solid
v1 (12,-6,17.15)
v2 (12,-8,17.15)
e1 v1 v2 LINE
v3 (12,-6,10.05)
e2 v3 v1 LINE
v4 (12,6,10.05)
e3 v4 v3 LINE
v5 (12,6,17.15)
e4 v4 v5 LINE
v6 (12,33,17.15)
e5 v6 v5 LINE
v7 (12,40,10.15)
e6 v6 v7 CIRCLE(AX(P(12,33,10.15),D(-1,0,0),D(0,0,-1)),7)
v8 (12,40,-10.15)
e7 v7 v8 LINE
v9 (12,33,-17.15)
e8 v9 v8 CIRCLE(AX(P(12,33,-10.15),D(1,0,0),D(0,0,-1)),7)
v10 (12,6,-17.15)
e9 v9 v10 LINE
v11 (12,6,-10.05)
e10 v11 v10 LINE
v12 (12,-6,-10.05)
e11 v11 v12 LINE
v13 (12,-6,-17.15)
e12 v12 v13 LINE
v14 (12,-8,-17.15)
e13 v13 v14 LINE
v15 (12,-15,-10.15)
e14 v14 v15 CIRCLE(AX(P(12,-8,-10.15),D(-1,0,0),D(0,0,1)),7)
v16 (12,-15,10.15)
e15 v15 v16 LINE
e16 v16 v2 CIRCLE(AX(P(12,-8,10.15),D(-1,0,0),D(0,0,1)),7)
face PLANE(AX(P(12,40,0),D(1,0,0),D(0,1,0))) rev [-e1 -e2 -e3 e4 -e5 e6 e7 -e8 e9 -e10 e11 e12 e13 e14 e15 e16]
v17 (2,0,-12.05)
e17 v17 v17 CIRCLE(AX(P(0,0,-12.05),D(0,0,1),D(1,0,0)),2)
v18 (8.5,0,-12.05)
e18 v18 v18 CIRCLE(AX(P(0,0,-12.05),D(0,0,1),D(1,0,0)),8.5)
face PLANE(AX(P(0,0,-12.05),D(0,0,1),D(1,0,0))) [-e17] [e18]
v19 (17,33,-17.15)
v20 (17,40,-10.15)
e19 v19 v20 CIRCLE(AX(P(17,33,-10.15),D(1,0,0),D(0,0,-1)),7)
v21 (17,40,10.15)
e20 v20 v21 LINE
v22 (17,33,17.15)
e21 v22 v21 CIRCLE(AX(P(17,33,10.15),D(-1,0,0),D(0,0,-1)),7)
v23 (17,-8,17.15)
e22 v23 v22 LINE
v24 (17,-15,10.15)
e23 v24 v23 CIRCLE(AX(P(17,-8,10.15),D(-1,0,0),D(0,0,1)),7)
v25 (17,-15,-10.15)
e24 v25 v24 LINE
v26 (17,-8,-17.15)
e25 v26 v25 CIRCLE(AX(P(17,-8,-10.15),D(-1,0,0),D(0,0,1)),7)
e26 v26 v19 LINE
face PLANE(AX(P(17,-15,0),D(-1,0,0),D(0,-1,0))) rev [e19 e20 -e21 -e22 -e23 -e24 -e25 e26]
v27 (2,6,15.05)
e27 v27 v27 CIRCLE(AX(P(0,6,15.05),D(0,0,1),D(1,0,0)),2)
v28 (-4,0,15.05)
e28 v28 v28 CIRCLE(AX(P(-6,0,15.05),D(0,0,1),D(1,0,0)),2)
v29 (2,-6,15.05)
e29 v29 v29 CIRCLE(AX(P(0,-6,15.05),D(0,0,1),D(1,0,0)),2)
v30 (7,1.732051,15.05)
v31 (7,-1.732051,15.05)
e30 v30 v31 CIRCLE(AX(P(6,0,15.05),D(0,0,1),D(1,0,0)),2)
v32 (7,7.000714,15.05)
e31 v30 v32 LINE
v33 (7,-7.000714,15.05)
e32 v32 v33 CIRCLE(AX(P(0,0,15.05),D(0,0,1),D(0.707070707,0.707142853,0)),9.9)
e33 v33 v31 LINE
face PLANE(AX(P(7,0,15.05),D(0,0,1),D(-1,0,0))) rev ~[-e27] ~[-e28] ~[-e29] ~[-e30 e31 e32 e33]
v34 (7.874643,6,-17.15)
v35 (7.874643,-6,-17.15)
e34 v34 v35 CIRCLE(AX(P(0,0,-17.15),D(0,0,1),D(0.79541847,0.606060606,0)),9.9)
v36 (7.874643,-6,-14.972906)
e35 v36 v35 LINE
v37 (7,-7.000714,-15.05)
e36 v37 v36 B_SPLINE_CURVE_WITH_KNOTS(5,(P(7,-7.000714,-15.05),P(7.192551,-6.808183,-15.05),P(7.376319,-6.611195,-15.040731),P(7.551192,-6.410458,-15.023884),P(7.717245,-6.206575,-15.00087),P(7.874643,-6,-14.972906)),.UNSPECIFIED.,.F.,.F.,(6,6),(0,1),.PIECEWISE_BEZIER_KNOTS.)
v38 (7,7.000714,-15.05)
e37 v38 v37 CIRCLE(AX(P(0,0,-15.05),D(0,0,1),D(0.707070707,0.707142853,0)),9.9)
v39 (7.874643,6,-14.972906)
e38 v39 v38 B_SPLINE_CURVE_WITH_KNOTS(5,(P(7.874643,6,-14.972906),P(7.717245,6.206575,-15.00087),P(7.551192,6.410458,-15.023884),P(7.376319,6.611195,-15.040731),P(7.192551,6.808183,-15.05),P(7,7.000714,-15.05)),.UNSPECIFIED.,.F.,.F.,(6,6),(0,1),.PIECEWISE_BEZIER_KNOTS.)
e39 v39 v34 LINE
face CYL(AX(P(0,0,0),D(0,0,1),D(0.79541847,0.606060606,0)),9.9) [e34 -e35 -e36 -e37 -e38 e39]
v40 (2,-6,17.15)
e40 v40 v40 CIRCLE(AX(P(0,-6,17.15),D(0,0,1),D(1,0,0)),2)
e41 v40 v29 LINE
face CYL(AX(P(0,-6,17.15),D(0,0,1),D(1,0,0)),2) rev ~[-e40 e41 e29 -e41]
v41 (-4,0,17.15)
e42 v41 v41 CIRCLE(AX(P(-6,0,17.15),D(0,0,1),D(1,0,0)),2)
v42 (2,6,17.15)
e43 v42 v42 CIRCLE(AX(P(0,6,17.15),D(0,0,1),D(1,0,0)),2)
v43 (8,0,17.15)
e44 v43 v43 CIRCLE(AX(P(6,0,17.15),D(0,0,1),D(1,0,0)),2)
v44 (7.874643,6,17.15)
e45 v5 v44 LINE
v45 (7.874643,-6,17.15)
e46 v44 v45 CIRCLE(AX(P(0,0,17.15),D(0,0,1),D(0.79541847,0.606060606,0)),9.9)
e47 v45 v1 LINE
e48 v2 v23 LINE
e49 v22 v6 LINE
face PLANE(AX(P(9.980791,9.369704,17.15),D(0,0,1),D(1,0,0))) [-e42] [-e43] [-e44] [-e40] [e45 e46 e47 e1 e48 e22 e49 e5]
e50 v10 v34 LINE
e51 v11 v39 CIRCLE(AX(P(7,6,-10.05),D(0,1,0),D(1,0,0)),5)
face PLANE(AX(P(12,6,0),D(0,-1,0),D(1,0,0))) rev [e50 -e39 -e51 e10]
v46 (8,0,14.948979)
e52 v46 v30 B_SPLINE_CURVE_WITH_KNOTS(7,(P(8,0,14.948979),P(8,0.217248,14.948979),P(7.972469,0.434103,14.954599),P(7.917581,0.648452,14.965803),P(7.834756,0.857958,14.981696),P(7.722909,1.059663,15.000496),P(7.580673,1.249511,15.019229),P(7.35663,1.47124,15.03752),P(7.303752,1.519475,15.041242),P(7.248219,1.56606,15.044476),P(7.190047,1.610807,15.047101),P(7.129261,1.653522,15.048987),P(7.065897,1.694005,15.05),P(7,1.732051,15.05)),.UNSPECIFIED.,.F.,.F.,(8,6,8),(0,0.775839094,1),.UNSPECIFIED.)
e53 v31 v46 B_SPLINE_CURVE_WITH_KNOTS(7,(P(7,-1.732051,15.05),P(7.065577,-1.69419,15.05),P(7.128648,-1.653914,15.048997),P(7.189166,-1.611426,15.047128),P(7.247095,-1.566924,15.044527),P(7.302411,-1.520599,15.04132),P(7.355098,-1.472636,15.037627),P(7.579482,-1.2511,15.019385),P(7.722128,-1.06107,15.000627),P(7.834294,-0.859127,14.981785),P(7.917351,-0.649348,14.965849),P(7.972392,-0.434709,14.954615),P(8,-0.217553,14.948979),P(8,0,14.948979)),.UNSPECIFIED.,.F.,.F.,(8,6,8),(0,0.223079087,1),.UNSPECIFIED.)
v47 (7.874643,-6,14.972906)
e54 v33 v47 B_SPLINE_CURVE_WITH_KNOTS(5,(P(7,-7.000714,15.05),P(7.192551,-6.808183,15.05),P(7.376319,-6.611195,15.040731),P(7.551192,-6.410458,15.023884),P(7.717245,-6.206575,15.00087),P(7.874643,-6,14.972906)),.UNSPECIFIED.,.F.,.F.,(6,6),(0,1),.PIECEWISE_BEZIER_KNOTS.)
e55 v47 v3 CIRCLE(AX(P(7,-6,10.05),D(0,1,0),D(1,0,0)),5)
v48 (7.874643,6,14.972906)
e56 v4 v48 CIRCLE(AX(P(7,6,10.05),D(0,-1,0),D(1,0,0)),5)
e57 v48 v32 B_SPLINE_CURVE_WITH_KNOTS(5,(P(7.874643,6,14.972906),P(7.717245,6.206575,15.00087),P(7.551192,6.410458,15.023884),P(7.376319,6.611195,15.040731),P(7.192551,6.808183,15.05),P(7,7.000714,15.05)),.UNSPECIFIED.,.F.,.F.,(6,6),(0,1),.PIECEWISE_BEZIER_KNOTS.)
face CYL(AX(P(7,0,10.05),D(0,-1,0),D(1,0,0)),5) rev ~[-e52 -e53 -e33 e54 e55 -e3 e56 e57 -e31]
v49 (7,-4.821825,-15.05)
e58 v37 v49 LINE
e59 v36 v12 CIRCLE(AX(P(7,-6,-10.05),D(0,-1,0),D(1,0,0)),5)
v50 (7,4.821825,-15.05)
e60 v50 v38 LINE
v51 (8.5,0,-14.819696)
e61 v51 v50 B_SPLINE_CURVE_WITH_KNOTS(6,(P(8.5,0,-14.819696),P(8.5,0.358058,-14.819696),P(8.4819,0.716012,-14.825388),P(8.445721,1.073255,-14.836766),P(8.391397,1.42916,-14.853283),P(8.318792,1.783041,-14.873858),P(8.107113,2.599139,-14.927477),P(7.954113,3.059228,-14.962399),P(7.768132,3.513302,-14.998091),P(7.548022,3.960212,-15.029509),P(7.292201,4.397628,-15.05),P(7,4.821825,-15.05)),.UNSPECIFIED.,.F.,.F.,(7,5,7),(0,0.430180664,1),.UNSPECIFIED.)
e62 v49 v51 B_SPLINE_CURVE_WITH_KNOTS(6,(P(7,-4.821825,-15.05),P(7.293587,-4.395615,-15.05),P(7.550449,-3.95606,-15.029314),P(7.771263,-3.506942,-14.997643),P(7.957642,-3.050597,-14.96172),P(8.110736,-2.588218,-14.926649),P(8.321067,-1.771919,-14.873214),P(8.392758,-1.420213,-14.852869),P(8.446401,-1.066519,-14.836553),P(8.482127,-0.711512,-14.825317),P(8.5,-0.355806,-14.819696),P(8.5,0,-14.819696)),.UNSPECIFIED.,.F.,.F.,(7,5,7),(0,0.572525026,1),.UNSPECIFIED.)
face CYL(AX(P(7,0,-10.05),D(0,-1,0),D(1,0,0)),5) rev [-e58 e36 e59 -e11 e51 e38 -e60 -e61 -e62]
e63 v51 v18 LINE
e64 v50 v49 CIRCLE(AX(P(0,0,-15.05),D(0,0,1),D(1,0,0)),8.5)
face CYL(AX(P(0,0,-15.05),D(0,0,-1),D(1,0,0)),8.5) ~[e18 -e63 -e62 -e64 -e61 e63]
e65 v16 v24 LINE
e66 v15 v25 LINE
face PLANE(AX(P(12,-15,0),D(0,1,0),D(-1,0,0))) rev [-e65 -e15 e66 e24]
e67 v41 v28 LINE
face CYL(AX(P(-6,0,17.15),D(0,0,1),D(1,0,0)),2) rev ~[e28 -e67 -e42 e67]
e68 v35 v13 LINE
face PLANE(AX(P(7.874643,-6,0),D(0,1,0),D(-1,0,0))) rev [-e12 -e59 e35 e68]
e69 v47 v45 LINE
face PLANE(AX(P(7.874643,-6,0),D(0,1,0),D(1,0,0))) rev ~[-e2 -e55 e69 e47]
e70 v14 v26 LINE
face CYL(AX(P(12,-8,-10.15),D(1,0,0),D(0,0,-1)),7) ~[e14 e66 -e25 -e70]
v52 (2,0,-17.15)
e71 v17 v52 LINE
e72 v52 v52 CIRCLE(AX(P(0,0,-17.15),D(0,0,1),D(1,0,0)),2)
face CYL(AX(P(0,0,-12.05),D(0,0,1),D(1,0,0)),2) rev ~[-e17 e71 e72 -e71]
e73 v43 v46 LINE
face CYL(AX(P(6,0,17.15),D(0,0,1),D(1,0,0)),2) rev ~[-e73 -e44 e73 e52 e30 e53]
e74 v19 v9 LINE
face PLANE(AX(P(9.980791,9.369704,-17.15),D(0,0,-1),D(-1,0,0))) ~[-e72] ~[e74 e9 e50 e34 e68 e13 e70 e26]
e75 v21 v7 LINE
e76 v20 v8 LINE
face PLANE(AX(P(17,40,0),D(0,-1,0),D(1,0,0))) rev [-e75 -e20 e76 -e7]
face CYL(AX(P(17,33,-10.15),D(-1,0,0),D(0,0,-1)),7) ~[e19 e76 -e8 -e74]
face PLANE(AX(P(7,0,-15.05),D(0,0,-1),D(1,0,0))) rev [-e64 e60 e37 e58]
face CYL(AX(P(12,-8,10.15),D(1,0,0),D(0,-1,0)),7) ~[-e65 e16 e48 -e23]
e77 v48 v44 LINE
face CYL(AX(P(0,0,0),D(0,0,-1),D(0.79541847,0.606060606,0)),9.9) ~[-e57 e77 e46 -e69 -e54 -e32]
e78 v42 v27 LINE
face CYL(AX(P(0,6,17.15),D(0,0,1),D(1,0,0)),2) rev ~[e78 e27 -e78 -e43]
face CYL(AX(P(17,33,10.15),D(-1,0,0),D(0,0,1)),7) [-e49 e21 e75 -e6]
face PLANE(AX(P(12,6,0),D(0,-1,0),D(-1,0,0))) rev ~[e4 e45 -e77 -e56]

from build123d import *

# Parameters (mm, degrees)
F1_DEPTH      = 17.15
F3_DEPTH      = 40.001
F3_DEPTH_BACK = 15.001
F5_R          = 8.5
F6_DEPTH      = 3
F7_R          = 2
F8_DEPTH      = 5.1010001
F9_R          = 2
F10_DEPTH     = 17.15
F11_R         = 7


with BuildPart() as f1:
    # F0 (on Top) → F1 (new body)
    with BuildSketch(Plane.XY):
        with BuildLine():
            Line((12, 6), (7.874642849, 6))
            ThreePointArc((7.874642849, 6), (-9.9, 0), (7.874642849, -6))
            Line((7.874642849, -6), (12, -6))
            Line((12, -6), (12, -15))
            Line((12, -15), (17, -15))
            Line((17, -15), (17, 40))
            Line((17, 40), (12, 40))
            Line((12, 40), (12, 6))
        make_face()
    extrude(amount=F1_DEPTH)

    # F2 (on Front) → F3 (cut, two sides)
    with BuildSketch(Plane.XZ) as f3_sk:
        with BuildLine():
            Line((7, 15.05), (-20, 15.05))
            Line((-20, 15.05), (-20, 0))
            Line((-20, 0), (12, 0))
            Line((12, 0), (12, 10.05))
            ThreePointArc((12, 10.05), (10.5355339059, 13.5855339059), (7, 15.05))
        make_face()
    extrude(amount=-F3_DEPTH, mode=Mode.SUBTRACT)
    extrude(f3_sk.sketch, amount=F3_DEPTH_BACK, mode=Mode.SUBTRACT)

    # F4: F1 across plane


with BuildPart() as f1_1:
    add(f1.part)
    add(f1.part.mirror(Plane.XY))

    # F5 (on face) → F6 (join)
    with BuildSketch(Plane.XY.offset(-15.05)):
        Circle(F5_R)
    extrude(amount=F6_DEPTH)

    # F7 (on face) → F8 (cut, through all)
    with BuildSketch(Plane.XY.offset(-12.05)):
        Circle(F7_R)
    extrude(amount=-F8_DEPTH, mode=Mode.SUBTRACT)

    # F9 (on face) → F10 (cut, through all)
    with BuildSketch(Plane.XY.offset(17.15)):
        with Locations((6, 0)):
            Circle(F9_R)
        with Locations((0, -6)):
            Circle(F9_R)
        with Locations((-6, 0)):
            Circle(F9_R)
        with Locations((0, 6)):
            Circle(F9_R)
    extrude(amount=-F10_DEPTH, mode=Mode.SUBTRACT)

    # F11
    f11_edges = [f1_1.edges().sort_by_distance(p)[0] for p in [
        (14.5, 40, 17.15),
        (14.5, 40, -17.15),
        (14.5, -15, -17.15),
        (14.5, -15, 17.15),
    ]]
    fillet(f11_edges, radius=F11_R)


solid = f1_1.part
